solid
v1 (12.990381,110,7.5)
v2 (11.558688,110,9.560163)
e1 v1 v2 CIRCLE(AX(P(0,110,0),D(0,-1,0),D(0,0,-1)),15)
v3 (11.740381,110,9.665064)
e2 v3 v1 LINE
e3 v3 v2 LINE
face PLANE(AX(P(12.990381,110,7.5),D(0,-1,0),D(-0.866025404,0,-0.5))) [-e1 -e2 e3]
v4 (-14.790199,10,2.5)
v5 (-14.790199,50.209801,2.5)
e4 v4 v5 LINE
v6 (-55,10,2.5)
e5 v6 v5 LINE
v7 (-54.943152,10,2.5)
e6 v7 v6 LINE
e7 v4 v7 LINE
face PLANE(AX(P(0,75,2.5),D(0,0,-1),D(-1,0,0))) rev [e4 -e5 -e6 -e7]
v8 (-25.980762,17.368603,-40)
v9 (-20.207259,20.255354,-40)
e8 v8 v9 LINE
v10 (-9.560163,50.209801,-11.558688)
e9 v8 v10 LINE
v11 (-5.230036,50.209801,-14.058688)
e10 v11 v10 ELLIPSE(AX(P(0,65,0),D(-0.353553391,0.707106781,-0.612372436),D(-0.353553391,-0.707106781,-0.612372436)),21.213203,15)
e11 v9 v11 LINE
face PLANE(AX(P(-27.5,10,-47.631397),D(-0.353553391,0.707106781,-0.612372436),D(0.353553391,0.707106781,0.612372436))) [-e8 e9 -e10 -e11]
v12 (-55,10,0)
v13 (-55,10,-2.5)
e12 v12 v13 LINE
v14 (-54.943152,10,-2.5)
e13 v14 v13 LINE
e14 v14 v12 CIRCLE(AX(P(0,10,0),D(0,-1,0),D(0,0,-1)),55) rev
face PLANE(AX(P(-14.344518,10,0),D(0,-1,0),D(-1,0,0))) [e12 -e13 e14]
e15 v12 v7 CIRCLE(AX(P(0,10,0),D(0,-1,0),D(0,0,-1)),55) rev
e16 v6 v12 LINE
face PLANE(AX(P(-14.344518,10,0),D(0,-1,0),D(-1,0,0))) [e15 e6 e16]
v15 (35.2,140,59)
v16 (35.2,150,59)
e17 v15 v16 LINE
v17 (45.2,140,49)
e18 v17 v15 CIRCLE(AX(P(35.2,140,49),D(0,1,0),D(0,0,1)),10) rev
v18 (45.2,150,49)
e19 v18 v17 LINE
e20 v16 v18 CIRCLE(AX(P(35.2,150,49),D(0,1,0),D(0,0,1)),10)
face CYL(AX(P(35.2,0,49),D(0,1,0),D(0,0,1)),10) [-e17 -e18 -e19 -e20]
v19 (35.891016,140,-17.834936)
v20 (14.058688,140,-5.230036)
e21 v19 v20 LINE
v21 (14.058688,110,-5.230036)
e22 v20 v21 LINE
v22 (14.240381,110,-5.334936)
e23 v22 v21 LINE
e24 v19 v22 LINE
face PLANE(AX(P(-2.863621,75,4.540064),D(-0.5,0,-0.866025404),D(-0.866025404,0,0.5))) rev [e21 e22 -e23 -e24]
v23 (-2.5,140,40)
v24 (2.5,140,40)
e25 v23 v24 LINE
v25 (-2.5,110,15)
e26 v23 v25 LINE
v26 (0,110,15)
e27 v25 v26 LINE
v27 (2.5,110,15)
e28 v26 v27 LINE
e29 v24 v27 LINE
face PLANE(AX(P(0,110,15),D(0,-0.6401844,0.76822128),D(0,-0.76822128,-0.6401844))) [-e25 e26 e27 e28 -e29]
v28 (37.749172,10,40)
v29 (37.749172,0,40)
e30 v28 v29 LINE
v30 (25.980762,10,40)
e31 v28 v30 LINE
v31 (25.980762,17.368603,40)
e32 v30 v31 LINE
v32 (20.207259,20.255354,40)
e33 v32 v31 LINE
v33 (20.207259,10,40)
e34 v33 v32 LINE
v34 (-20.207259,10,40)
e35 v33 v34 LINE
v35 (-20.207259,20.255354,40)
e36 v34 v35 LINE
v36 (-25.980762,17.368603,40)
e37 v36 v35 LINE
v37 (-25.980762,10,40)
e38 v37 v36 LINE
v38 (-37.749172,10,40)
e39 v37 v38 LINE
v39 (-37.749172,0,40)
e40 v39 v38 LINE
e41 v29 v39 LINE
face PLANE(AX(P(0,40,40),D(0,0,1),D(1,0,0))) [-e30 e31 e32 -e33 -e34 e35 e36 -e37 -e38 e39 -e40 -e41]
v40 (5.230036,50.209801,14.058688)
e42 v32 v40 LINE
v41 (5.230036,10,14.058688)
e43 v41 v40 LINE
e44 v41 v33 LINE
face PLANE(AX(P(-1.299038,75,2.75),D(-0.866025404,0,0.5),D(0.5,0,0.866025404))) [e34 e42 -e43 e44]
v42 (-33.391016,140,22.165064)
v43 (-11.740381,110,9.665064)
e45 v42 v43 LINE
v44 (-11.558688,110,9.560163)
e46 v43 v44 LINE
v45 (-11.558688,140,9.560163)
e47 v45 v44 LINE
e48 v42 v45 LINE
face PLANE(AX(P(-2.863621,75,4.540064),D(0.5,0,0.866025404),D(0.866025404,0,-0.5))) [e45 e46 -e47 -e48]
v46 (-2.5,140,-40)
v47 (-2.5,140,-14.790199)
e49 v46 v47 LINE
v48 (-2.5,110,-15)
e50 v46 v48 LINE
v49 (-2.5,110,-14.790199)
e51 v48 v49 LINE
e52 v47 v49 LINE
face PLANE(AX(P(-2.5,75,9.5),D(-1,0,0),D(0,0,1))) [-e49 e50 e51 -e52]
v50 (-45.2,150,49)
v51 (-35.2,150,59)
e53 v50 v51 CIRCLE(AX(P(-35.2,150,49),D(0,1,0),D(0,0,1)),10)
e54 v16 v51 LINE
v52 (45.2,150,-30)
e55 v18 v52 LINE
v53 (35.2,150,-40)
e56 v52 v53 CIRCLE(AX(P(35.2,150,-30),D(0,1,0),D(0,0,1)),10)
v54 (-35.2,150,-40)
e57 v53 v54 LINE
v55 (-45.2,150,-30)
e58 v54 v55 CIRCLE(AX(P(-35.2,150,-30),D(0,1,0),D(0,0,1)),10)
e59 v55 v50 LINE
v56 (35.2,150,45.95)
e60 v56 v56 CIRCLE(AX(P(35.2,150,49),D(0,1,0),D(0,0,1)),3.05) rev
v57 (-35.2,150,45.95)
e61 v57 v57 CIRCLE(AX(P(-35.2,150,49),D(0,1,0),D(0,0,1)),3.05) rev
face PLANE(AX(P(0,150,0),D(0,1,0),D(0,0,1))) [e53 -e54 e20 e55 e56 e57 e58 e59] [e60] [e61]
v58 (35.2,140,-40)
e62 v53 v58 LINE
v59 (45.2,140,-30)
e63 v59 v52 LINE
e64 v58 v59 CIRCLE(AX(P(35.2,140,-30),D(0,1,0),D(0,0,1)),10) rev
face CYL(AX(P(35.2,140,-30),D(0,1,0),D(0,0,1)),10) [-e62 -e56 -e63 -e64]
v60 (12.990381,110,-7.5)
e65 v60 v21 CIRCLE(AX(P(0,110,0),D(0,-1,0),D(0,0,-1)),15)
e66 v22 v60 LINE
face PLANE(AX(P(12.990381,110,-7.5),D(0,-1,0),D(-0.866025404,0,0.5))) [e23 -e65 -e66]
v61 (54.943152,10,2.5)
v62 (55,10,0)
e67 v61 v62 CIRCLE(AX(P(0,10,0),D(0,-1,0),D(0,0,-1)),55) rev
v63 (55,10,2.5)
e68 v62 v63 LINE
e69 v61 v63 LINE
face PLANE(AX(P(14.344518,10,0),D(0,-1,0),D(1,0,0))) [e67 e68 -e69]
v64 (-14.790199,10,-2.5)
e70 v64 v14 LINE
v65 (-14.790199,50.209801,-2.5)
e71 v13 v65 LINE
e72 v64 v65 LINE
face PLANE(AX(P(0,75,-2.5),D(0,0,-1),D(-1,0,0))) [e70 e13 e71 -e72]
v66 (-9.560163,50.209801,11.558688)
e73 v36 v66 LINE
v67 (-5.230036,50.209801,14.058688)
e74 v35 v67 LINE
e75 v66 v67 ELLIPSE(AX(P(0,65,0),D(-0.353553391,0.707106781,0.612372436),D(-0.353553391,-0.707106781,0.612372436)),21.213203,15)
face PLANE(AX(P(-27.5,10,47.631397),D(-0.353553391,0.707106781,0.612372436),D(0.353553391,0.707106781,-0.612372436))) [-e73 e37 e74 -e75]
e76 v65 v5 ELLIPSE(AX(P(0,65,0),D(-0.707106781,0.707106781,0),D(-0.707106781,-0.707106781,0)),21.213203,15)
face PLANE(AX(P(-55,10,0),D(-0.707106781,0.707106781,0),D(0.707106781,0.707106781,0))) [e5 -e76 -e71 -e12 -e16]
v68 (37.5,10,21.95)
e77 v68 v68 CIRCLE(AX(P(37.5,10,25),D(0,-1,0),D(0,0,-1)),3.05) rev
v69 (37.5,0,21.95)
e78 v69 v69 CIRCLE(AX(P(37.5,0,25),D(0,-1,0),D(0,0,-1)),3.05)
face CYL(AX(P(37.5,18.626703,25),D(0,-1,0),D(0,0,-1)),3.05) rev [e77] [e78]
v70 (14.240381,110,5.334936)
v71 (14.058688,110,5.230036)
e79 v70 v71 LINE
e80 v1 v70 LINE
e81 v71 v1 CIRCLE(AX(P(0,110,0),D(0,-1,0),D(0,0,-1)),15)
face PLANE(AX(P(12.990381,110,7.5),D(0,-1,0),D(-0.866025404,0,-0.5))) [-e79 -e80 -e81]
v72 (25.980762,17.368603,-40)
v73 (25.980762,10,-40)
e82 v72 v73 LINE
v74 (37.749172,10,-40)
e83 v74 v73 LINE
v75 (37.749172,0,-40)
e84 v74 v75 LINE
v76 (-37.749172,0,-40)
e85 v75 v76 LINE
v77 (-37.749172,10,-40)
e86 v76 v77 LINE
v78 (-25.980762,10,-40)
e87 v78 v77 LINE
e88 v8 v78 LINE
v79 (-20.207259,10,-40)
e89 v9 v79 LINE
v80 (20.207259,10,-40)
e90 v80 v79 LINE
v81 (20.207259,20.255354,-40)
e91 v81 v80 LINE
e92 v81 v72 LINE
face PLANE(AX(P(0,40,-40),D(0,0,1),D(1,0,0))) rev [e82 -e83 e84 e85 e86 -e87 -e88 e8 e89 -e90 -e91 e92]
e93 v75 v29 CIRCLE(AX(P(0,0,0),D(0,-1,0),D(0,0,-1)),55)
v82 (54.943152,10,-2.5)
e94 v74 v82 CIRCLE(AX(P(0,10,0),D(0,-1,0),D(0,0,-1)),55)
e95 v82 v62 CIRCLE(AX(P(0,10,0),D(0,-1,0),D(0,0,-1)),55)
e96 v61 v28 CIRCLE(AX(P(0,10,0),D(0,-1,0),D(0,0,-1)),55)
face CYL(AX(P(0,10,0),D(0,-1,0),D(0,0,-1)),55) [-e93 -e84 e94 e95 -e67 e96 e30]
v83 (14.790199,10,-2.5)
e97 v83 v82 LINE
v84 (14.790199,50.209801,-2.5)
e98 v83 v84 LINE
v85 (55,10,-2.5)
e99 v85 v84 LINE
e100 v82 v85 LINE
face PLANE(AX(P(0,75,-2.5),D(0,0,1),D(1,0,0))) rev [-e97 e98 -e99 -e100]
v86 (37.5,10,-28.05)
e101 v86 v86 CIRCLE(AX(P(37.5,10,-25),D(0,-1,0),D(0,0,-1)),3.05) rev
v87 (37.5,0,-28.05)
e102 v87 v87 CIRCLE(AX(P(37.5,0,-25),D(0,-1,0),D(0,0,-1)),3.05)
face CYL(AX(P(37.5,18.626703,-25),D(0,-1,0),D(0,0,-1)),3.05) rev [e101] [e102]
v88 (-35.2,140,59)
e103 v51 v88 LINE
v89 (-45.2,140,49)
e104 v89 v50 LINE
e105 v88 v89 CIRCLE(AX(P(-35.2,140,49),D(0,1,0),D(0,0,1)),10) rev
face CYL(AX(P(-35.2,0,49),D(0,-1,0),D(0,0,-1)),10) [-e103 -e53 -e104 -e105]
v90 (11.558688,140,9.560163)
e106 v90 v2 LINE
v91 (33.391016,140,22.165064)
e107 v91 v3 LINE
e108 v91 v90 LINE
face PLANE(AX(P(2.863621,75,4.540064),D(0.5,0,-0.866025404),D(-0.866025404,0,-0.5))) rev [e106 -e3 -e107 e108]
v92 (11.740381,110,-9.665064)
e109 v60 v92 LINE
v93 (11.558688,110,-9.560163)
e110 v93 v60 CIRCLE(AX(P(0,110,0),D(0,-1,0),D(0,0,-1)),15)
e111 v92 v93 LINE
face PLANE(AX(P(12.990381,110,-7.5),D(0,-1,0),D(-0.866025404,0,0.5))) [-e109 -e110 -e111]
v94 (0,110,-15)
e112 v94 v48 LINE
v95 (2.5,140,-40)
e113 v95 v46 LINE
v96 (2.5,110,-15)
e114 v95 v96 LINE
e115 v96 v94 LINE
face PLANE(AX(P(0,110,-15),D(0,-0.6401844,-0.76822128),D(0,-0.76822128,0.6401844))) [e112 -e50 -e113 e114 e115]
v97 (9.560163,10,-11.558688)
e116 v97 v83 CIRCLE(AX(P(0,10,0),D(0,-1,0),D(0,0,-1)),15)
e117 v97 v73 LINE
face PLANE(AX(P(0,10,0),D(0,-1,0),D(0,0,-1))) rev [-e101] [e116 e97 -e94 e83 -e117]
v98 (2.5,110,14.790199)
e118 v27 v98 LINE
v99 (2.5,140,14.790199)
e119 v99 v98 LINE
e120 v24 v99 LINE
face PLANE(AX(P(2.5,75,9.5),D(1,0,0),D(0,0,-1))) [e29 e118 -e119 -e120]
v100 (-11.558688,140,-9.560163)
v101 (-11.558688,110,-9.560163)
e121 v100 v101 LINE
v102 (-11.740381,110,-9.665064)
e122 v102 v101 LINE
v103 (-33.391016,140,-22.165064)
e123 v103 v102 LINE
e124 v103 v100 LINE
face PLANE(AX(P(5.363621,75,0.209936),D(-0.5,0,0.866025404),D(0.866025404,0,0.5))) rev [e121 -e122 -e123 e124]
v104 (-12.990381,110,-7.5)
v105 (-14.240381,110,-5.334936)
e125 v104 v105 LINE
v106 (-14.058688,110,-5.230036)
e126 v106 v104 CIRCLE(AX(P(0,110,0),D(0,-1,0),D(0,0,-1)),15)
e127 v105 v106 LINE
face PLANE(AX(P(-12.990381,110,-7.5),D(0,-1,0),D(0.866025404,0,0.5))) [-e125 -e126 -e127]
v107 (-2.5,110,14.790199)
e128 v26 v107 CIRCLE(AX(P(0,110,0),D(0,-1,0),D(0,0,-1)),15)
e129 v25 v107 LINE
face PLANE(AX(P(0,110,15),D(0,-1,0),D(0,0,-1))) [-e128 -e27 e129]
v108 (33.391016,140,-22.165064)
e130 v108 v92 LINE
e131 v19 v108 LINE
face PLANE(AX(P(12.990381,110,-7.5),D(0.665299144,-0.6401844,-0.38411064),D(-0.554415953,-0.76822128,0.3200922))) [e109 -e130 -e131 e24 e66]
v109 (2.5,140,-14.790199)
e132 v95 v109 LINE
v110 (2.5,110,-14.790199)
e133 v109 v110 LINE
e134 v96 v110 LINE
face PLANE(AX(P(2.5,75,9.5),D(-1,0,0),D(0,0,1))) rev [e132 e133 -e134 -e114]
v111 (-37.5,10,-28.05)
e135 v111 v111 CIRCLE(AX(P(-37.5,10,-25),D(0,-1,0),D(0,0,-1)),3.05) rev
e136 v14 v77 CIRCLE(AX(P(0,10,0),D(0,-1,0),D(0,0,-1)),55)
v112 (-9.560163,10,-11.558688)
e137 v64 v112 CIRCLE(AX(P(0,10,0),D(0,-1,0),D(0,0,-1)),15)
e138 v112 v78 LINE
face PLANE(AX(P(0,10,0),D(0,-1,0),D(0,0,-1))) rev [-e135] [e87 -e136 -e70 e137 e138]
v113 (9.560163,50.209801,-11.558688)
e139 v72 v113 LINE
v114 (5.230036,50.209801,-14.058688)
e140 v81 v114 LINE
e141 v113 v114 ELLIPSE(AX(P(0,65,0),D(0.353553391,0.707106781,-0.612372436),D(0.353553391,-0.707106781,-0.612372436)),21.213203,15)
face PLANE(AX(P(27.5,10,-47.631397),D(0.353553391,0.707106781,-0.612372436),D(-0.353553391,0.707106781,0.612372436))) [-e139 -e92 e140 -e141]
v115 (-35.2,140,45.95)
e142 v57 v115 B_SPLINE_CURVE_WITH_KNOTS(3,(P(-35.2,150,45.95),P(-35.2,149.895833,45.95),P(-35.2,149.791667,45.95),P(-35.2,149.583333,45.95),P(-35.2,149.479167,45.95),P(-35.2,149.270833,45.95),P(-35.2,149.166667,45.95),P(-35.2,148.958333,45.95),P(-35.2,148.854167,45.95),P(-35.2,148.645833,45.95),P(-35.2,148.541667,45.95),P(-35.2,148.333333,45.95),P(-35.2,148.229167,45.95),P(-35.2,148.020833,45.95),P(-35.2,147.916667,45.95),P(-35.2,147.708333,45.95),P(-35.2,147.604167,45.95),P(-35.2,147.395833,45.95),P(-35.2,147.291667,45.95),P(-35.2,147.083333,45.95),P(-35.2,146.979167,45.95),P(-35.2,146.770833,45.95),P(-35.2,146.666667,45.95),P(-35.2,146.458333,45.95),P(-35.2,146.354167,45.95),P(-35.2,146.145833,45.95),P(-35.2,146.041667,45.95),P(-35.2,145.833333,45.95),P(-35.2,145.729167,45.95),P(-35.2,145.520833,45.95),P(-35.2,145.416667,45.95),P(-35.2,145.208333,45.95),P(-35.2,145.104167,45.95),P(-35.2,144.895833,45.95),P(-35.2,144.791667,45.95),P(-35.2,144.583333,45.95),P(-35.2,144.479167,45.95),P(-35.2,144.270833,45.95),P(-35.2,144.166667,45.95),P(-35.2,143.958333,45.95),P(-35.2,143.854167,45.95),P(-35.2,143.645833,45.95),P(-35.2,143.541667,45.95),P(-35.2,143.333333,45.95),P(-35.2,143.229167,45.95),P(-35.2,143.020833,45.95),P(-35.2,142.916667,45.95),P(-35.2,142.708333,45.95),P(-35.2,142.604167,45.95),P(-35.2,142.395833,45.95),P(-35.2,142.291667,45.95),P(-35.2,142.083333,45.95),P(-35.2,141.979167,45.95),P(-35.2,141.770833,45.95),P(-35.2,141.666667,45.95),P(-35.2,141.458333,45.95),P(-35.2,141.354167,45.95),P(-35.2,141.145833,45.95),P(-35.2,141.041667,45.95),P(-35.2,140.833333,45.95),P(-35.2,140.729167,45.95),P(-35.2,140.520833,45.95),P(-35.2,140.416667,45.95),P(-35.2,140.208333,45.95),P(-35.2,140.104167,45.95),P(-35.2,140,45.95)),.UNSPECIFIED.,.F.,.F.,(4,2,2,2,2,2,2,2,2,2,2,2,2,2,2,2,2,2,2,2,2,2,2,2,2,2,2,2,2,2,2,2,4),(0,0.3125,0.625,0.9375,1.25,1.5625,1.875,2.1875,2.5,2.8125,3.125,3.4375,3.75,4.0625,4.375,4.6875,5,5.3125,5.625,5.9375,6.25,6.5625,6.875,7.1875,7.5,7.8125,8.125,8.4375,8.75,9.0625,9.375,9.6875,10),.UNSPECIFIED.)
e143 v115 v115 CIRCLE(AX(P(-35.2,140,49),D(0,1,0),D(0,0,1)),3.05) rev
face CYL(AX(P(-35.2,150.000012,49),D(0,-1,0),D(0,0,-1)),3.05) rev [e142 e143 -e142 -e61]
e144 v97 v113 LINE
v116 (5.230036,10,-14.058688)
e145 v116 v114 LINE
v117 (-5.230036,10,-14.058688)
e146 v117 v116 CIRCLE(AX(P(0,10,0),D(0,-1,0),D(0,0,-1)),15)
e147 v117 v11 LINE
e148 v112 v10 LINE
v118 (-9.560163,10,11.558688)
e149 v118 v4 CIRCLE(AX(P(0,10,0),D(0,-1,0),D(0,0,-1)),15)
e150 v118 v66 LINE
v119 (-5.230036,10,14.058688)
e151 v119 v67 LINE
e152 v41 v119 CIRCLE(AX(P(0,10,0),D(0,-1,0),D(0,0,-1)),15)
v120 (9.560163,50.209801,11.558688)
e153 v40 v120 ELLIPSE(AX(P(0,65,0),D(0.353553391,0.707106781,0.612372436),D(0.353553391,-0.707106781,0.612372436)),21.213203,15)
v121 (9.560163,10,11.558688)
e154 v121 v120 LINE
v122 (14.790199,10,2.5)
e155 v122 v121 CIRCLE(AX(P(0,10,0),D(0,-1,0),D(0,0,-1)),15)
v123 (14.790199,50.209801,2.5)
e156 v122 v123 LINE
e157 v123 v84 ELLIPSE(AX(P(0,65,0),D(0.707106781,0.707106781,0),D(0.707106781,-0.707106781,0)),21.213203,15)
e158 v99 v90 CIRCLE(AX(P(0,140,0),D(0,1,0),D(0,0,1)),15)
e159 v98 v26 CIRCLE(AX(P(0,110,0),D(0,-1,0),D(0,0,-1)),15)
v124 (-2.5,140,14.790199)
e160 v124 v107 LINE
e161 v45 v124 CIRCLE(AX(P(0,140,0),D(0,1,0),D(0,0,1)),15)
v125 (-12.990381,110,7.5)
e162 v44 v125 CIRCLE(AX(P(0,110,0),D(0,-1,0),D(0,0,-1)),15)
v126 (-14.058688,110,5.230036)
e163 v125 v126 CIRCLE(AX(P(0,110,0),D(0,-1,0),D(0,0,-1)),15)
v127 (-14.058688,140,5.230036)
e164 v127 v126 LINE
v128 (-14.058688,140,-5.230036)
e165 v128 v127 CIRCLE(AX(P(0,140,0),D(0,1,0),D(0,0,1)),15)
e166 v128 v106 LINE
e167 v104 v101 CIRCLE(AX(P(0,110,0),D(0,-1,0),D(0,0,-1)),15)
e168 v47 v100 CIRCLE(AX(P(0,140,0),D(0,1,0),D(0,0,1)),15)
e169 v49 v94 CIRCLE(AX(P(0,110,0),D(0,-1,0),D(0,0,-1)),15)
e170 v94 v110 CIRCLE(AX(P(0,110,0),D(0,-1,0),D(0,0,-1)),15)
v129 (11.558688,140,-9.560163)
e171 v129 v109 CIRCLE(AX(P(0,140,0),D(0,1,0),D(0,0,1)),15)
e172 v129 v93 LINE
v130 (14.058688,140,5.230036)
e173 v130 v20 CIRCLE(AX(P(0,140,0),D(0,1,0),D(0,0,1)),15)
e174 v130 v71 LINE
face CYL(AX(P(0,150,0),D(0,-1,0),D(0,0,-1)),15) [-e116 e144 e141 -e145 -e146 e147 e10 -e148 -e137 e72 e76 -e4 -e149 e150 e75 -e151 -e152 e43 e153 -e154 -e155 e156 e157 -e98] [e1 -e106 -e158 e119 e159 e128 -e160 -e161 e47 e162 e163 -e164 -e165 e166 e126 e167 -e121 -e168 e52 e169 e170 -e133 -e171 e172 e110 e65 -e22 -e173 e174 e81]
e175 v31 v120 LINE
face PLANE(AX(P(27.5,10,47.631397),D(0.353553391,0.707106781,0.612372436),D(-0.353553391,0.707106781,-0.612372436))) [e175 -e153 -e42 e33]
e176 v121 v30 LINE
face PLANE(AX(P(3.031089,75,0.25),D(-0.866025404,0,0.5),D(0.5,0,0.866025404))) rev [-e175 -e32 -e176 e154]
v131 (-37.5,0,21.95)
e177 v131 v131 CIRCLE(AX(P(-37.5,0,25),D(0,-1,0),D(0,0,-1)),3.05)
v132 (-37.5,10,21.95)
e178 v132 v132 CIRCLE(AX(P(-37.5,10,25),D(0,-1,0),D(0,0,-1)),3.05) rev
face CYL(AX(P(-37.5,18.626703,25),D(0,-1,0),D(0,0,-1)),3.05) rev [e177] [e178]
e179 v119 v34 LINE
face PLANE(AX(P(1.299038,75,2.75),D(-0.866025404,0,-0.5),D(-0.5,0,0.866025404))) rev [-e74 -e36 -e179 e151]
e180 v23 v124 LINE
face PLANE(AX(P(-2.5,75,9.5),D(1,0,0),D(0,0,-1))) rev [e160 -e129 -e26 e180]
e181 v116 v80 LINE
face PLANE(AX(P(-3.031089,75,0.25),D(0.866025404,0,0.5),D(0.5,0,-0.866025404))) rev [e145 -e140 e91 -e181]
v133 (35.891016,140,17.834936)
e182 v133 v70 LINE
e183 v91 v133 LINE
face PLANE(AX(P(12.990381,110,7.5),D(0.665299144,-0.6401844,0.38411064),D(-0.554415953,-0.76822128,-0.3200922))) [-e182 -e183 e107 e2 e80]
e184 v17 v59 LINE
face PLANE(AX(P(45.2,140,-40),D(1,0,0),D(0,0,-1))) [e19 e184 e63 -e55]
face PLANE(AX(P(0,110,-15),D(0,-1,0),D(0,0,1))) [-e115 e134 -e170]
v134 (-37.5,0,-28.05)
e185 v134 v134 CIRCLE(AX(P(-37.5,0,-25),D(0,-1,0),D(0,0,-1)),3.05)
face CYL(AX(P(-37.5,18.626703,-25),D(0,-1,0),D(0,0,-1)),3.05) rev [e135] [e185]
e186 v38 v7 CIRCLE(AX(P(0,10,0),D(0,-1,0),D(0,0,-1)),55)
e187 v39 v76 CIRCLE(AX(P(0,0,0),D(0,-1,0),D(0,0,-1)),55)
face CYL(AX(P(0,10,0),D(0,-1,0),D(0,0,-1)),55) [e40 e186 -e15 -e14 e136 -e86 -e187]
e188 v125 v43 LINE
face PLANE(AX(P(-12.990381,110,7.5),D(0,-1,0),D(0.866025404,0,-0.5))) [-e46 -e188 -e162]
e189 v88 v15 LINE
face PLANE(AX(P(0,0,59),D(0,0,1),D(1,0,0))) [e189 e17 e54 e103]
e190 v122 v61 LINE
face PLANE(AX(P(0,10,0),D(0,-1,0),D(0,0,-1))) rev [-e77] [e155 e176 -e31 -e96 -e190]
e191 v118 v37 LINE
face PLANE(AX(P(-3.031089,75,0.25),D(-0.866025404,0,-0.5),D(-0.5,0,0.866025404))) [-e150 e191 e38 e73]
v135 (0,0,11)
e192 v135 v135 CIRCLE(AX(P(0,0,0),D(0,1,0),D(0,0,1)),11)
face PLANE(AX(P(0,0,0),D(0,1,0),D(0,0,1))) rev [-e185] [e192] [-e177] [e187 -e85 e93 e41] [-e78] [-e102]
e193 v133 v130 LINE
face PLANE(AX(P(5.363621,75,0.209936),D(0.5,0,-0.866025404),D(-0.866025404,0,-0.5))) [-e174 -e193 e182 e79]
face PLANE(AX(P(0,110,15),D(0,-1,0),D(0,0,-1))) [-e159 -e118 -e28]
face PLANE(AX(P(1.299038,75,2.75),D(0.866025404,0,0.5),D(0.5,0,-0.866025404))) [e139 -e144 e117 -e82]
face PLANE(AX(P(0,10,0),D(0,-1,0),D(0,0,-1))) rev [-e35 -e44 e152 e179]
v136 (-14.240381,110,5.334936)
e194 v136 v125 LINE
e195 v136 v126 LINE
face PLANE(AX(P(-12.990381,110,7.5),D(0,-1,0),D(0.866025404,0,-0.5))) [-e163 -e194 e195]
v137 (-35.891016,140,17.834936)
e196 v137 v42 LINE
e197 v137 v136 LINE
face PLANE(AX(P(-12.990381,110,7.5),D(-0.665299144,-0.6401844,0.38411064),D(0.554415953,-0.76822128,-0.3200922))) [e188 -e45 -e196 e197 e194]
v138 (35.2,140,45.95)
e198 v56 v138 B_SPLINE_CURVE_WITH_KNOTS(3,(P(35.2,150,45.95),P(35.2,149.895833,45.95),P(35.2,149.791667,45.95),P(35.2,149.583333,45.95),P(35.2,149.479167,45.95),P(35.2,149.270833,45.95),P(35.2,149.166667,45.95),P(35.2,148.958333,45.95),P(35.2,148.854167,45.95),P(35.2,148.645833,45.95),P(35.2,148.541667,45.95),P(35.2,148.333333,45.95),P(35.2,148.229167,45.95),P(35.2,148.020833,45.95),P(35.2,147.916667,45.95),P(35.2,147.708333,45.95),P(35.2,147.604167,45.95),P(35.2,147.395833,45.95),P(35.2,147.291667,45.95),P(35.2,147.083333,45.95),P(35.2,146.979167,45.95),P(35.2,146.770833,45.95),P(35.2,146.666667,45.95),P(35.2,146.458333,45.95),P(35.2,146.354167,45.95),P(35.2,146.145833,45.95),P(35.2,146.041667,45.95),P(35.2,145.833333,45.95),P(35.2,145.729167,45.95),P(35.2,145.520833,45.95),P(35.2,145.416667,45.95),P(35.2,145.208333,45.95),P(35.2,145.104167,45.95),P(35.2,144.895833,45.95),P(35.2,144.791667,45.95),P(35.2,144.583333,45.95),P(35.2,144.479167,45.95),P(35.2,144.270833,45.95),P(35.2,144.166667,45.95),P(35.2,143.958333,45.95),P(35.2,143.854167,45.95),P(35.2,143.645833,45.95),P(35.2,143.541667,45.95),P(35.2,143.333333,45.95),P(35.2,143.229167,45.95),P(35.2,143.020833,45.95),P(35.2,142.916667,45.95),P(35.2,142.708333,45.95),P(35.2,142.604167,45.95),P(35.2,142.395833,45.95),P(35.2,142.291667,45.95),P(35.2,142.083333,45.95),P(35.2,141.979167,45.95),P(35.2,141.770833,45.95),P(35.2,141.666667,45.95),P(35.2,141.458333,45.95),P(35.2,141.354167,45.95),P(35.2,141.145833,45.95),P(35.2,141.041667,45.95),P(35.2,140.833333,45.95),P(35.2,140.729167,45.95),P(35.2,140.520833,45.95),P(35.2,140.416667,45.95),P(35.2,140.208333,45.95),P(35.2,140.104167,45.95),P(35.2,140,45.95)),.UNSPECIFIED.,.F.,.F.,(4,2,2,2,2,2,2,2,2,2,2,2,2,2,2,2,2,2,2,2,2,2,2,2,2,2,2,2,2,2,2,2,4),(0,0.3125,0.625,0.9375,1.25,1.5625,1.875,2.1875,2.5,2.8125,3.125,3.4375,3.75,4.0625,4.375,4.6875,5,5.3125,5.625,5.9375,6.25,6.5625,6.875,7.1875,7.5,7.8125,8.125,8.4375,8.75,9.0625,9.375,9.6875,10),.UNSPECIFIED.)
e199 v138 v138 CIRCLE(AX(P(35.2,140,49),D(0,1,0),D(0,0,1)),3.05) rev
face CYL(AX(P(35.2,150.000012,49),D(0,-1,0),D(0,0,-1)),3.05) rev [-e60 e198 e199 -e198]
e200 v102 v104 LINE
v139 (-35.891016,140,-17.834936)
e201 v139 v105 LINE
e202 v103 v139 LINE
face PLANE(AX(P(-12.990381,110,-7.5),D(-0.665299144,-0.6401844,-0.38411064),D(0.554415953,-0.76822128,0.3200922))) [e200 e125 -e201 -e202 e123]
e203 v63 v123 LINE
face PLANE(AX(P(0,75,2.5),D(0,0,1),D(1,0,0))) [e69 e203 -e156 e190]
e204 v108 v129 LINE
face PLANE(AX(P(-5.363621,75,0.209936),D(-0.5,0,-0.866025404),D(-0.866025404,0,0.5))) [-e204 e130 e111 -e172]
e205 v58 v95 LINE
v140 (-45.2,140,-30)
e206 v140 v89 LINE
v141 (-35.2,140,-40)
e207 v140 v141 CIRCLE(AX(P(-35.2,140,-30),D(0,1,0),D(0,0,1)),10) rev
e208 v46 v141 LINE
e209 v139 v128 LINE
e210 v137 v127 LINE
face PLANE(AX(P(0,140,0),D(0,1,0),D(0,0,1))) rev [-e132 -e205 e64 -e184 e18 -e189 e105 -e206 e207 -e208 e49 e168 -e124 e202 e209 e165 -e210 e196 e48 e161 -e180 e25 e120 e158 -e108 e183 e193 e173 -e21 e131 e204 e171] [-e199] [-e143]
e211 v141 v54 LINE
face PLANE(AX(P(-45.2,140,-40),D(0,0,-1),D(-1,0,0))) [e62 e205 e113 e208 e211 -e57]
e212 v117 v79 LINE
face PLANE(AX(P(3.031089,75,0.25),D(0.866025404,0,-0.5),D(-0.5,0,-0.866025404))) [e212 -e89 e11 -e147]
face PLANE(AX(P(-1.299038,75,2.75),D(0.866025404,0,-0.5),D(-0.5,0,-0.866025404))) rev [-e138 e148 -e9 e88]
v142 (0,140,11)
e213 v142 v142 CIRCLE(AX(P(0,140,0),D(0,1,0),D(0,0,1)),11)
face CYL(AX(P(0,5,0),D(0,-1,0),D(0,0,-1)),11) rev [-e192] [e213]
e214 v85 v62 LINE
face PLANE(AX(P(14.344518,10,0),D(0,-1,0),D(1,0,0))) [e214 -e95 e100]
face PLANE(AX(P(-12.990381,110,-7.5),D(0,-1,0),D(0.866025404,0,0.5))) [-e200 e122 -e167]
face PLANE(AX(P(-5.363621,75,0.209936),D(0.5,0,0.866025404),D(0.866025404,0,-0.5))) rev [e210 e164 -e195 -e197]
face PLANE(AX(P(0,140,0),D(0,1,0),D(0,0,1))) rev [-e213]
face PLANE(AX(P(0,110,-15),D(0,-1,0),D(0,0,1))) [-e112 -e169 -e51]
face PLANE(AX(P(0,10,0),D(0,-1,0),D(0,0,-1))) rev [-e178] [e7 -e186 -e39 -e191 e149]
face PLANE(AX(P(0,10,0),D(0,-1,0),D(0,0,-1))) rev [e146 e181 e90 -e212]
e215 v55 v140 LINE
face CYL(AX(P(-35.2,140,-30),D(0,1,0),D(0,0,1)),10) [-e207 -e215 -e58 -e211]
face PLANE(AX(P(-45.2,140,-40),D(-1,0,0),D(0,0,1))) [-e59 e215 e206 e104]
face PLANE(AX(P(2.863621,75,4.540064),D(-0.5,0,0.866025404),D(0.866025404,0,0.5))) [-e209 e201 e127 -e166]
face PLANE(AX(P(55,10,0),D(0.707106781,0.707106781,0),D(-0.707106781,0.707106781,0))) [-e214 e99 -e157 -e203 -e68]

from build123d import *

# Parameters (mm, degrees)
SKETCH1_R                      = 2.55
SKETCH1_R_2                    = 11
BASE_DEPTH                     = 5
SKETCH1_3_R                    = 15
SKETCH1_3_R_2                  = 11
STEM_DEPTH                     = 150
SKETCH4_W                      = 90.4
SKETCH4_H                      = 80
TOP_PLATE_DEPTH                = 10
SKETCH6_W                      = 90.4
SKETCH6_H                      = 10
BOSS_EXTRUDE7_DEPTH            = 19
RIB1_START                     = -2.5
RIB1_DEPTH                     = 5
CIRPATTERN6_COUNT              = 6
CUT_EXTRUDE1_REACH             = 170.039
SKETCH10_R                     = 3.05
CUT_EXTRUDE1_DIRECTION_2_DEPTH = 169.039429897
FILLET1_R                      = 10
FILLET2_R                      = 10
SKETCH11_R                     = 55
NEW_BASE_DEPTH                 = 10
RIB2_START                     = -2.5
RIB2_DEPTH                     = 5
CIRPATTERN7_COUNT              = 6
SKETCH13_R                     = 3.05
CUT_EXTRUDE2_DEPTH             = 10
FILLET3_R                      = 10
SKETCH15_R                     = 11
REMOVE_CENTER_DEPTH            = 162.573512681
BASE_CUT_DEPTH                 = 40


with BuildPart() as part:
    # Sketch1 → base (new body)
    with BuildSketch(Plane(origin=(0, 0, 0), x_dir=(1, 0, 0), z_dir=(0, 1, 0))):
        with BuildLine():
            Line((-16, 25.377155081), (-42.833333333, 8.459051694))
            ThreePointArc((-42.833333333, 8.459051694), (-47.5, 0), (-42.833333333, -8.459051694))
            Line((-42.833333333, -8.459051694), (-16, -25.377155081))
            ThreePointArc((-16, -25.377155081), (0, -30), (16, -25.377155081))
            Line((16, -25.377155081), (42.833333333, -8.459051694))
            ThreePointArc((42.833333333, -8.459051694), (47.5, 0), (42.833333333, 8.459051694))
            Line((42.833333333, 8.459051694), (16, 25.377155081))
            ThreePointArc((16, 25.377155081), (0, 30), (-16, 25.377155081))
        make_face()
        with Locations(Location((-37.5, 0, 0), (0, 0, 270))):
            Circle(SKETCH1_R, mode=Mode.SUBTRACT)
        with Locations(Location((37.5, 0, 0), (0, 0, 270))):
            Circle(SKETCH1_R, mode=Mode.SUBTRACT)
        with Locations(Location((0, 0, 0), (0, 0, 270))):
            Circle(SKETCH1_R_2, mode=Mode.SUBTRACT)
    extrude(amount=BASE_DEPTH)

    # Sketch1<3> → stem (add)
    with BuildSketch(Plane(origin=(0, 0, 0), x_dir=(1, 0, 0), z_dir=(0, 1, 0))):
        with Locations(Location((0, 0, 0), (0, 0, 270))):
            Circle(SKETCH1_3_R)
        with Locations(Location((0, 0, 0), (0, 0, 270))):
            Circle(SKETCH1_3_R_2, mode=Mode.SUBTRACT)
    extrude(amount=STEM_DEPTH)

    # Sketch4 → top plate (add)
    with BuildSketch(Plane(origin=(0, 150, 0), x_dir=(1, 0, 0), z_dir=(0, 1, 0))):
        Rectangle(SKETCH4_W, SKETCH4_H)
    extrude(amount=-TOP_PLATE_DEPTH)

    # Sketch6 → Boss-Extrude7 (add)
    with BuildSketch(Plane.XY.offset(40)):
        with Locations((0, 145)):
            Rectangle(SKETCH6_W, SKETCH6_H)
    extrude(amount=BOSS_EXTRUDE7_DEPTH)

    # Rib1: read off the stored shape, not the designer's step
    # Rib1 outline → Rib1 (add)
    with BuildSketch(Plane(origin=(0, 0, 0), x_dir=(0, 0, -1), z_dir=(1, 0, 0)).offset(RIB1_START)):
        Polygon((-15, 110), (-14.790199458, 110), (-14.790199458, 140), (-40, 140), align=None)
    rib1 = extrude(amount=RIB1_DEPTH)

    # CirPattern6: Rib1 ×6 about axis
    cirpattern6_axis = Axis((0, 0, 0), (0, 1, 0))
    for i in range(1, CIRPATTERN6_COUNT):
        add(rib1.rotate(cirpattern6_axis, i * 360 / CIRPATTERN6_COUNT))

    # Sketch10 → Cut-Extrude1 (cut, up to next)
    with BuildSketch(Plane(origin=(0, 150, 0), x_dir=(1, 0, 0), z_dir=(0, 1, 0)), mode=Mode.PRIVATE) as cut_extrude1_sk1:
        with Locations(Location((35.2, -49, 0), (0, 0, 90))):
            Circle(SKETCH10_R)
    cut_extrude1_tool1 = extrude(cut_extrude1_sk1.sketch, amount=-CUT_EXTRUDE1_REACH, mode=Mode.PRIVATE) & part.part
    # Sketch10 → Cut-Extrude1 (cut, up to next)
    with BuildSketch(Plane(origin=(0, 150, 0), x_dir=(1, 0, 0), z_dir=(0, 1, 0)), mode=Mode.PRIVATE) as cut_extrude1_sk2:
        with Locations(Location((-35.2, -49, 0), (0, 0, 90))):
            Circle(SKETCH10_R)
    cut_extrude1_tool2 = extrude(cut_extrude1_sk2.sketch, amount=-CUT_EXTRUDE1_REACH, mode=Mode.PRIVATE) & part.part
    add(cut_extrude1_tool1.solids().sort_by_distance((35.2, 150, 49))[0], mode=Mode.SUBTRACT)
    add(cut_extrude1_tool2.solids().sort_by_distance((-35.2, 150, 49))[0], mode=Mode.SUBTRACT)

    # Sketch10 → Cut-Extrude1 direction 2 (cut)
    with BuildSketch(Plane(origin=(0, 150, 0), x_dir=(1, 0, 0), z_dir=(0, 1, 0))):
        with Locations(Location((35.2, -49, 0), (0, 0, 90))):
            Circle(SKETCH10_R)
        with Locations(Location((-35.2, -49, 0), (0, 0, 90))):
            Circle(SKETCH10_R)
    extrude(amount=CUT_EXTRUDE1_DIRECTION_2_DEPTH, mode=Mode.SUBTRACT)

    # Fillet1
    fillet1_edges = [part.edges().sort_by_distance(p)[0] for p in [
        (-45.2, 145, 59),
    ]]
    fillet(fillet1_edges, radius=FILLET1_R)

    # Fillet2
    fillet2_edges = [part.edges().sort_by_distance(p)[0] for p in [
        (45.2, 145, 59),
    ]]
    fillet(fillet2_edges, radius=FILLET2_R)

    # Sketch11 → new base (add)
    with BuildSketch(Plane.XZ):
        with Locations(Location((0, 0, 0), (0, 0, 270))):
            Circle(SKETCH11_R)
    extrude(amount=-NEW_BASE_DEPTH)

    # Rib2: read off the stored shape, not the designer's step
    # Rib2 outline → Rib2 (add)
    with BuildSketch(Plane.XY.offset(RIB2_START)):
        Polygon((13, 10), (55, 10), (13, 52), align=None)
    rib2 = extrude(amount=RIB2_DEPTH)

    # CirPattern7: Rib2 ×6 about axis
    cirpattern7_axis = Axis((0, 0, 0), (0, 1, 0))
    for i in range(1, CIRPATTERN7_COUNT):
        add(rib2.rotate(cirpattern7_axis, i * 360 / CIRPATTERN7_COUNT))

    # Sketch13 → Cut-Extrude2 (cut)
    with BuildSketch(Plane.XZ):
        with Locations(Location((-37.5, -25, 0), (0, 0, 270))):
            Circle(SKETCH13_R)
        with Locations(Location((-37.5, 25, 0), (0, 0, 270))):
            Circle(SKETCH13_R)
        with Locations(Location((37.5, 25, 0), (0, 0, 270))):
            Circle(SKETCH13_R)
        with Locations(Location((37.5, -25, 0), (0, 0, 270))):
            Circle(SKETCH13_R)
    extrude(amount=-CUT_EXTRUDE2_DEPTH, mode=Mode.SUBTRACT)

    # Fillet3
    fillet3_edges = [part.edges().sort_by_distance(p)[0] for p in [
        (45.2, 145, -40),
        (-45.2, 145, -40),
    ]]
    fillet(fillet3_edges, radius=FILLET3_R)

    # Sketch15 → remove center (cut, through all)
    with BuildSketch(Plane(origin=(0, 10, 0), x_dir=(1, 0, 0), z_dir=(0, 1, 0))):
        with Locations(Location((0, 0, 0), (0, 0, 270))):
            Circle(SKETCH15_R)
    extrude(amount=-REMOVE_CENTER_DEPTH, mode=Mode.SUBTRACT)

    # Sketch16 → base cut (cut)
    with BuildSketch(Plane.XZ):
        with BuildLine():
            Line((-37.749172176, 40), (37.749172176, 40))
            ThreePointArc((37.749172176, 40), (0, 55), (-37.749172176, 40))
        make_face()
        with BuildLine():
            ThreePointArc((-37.749172176, -40), (0, -55), (37.749172176, -40))
            Line((37.749172176, -40), (-37.749172176, -40))
        make_face()
    extrude(amount=-BASE_CUT_DEPTH, mode=Mode.SUBTRACT)


with BuildPart() as base_cut_kept_piece:
    # of the separate pieces the step leaves, the one the design keeps (base_cut_pieces_kept)
    add(part.part.solids().sort_by_distance((45.2, 140, -30))[0])


solid = base_cut_kept_piece.part
